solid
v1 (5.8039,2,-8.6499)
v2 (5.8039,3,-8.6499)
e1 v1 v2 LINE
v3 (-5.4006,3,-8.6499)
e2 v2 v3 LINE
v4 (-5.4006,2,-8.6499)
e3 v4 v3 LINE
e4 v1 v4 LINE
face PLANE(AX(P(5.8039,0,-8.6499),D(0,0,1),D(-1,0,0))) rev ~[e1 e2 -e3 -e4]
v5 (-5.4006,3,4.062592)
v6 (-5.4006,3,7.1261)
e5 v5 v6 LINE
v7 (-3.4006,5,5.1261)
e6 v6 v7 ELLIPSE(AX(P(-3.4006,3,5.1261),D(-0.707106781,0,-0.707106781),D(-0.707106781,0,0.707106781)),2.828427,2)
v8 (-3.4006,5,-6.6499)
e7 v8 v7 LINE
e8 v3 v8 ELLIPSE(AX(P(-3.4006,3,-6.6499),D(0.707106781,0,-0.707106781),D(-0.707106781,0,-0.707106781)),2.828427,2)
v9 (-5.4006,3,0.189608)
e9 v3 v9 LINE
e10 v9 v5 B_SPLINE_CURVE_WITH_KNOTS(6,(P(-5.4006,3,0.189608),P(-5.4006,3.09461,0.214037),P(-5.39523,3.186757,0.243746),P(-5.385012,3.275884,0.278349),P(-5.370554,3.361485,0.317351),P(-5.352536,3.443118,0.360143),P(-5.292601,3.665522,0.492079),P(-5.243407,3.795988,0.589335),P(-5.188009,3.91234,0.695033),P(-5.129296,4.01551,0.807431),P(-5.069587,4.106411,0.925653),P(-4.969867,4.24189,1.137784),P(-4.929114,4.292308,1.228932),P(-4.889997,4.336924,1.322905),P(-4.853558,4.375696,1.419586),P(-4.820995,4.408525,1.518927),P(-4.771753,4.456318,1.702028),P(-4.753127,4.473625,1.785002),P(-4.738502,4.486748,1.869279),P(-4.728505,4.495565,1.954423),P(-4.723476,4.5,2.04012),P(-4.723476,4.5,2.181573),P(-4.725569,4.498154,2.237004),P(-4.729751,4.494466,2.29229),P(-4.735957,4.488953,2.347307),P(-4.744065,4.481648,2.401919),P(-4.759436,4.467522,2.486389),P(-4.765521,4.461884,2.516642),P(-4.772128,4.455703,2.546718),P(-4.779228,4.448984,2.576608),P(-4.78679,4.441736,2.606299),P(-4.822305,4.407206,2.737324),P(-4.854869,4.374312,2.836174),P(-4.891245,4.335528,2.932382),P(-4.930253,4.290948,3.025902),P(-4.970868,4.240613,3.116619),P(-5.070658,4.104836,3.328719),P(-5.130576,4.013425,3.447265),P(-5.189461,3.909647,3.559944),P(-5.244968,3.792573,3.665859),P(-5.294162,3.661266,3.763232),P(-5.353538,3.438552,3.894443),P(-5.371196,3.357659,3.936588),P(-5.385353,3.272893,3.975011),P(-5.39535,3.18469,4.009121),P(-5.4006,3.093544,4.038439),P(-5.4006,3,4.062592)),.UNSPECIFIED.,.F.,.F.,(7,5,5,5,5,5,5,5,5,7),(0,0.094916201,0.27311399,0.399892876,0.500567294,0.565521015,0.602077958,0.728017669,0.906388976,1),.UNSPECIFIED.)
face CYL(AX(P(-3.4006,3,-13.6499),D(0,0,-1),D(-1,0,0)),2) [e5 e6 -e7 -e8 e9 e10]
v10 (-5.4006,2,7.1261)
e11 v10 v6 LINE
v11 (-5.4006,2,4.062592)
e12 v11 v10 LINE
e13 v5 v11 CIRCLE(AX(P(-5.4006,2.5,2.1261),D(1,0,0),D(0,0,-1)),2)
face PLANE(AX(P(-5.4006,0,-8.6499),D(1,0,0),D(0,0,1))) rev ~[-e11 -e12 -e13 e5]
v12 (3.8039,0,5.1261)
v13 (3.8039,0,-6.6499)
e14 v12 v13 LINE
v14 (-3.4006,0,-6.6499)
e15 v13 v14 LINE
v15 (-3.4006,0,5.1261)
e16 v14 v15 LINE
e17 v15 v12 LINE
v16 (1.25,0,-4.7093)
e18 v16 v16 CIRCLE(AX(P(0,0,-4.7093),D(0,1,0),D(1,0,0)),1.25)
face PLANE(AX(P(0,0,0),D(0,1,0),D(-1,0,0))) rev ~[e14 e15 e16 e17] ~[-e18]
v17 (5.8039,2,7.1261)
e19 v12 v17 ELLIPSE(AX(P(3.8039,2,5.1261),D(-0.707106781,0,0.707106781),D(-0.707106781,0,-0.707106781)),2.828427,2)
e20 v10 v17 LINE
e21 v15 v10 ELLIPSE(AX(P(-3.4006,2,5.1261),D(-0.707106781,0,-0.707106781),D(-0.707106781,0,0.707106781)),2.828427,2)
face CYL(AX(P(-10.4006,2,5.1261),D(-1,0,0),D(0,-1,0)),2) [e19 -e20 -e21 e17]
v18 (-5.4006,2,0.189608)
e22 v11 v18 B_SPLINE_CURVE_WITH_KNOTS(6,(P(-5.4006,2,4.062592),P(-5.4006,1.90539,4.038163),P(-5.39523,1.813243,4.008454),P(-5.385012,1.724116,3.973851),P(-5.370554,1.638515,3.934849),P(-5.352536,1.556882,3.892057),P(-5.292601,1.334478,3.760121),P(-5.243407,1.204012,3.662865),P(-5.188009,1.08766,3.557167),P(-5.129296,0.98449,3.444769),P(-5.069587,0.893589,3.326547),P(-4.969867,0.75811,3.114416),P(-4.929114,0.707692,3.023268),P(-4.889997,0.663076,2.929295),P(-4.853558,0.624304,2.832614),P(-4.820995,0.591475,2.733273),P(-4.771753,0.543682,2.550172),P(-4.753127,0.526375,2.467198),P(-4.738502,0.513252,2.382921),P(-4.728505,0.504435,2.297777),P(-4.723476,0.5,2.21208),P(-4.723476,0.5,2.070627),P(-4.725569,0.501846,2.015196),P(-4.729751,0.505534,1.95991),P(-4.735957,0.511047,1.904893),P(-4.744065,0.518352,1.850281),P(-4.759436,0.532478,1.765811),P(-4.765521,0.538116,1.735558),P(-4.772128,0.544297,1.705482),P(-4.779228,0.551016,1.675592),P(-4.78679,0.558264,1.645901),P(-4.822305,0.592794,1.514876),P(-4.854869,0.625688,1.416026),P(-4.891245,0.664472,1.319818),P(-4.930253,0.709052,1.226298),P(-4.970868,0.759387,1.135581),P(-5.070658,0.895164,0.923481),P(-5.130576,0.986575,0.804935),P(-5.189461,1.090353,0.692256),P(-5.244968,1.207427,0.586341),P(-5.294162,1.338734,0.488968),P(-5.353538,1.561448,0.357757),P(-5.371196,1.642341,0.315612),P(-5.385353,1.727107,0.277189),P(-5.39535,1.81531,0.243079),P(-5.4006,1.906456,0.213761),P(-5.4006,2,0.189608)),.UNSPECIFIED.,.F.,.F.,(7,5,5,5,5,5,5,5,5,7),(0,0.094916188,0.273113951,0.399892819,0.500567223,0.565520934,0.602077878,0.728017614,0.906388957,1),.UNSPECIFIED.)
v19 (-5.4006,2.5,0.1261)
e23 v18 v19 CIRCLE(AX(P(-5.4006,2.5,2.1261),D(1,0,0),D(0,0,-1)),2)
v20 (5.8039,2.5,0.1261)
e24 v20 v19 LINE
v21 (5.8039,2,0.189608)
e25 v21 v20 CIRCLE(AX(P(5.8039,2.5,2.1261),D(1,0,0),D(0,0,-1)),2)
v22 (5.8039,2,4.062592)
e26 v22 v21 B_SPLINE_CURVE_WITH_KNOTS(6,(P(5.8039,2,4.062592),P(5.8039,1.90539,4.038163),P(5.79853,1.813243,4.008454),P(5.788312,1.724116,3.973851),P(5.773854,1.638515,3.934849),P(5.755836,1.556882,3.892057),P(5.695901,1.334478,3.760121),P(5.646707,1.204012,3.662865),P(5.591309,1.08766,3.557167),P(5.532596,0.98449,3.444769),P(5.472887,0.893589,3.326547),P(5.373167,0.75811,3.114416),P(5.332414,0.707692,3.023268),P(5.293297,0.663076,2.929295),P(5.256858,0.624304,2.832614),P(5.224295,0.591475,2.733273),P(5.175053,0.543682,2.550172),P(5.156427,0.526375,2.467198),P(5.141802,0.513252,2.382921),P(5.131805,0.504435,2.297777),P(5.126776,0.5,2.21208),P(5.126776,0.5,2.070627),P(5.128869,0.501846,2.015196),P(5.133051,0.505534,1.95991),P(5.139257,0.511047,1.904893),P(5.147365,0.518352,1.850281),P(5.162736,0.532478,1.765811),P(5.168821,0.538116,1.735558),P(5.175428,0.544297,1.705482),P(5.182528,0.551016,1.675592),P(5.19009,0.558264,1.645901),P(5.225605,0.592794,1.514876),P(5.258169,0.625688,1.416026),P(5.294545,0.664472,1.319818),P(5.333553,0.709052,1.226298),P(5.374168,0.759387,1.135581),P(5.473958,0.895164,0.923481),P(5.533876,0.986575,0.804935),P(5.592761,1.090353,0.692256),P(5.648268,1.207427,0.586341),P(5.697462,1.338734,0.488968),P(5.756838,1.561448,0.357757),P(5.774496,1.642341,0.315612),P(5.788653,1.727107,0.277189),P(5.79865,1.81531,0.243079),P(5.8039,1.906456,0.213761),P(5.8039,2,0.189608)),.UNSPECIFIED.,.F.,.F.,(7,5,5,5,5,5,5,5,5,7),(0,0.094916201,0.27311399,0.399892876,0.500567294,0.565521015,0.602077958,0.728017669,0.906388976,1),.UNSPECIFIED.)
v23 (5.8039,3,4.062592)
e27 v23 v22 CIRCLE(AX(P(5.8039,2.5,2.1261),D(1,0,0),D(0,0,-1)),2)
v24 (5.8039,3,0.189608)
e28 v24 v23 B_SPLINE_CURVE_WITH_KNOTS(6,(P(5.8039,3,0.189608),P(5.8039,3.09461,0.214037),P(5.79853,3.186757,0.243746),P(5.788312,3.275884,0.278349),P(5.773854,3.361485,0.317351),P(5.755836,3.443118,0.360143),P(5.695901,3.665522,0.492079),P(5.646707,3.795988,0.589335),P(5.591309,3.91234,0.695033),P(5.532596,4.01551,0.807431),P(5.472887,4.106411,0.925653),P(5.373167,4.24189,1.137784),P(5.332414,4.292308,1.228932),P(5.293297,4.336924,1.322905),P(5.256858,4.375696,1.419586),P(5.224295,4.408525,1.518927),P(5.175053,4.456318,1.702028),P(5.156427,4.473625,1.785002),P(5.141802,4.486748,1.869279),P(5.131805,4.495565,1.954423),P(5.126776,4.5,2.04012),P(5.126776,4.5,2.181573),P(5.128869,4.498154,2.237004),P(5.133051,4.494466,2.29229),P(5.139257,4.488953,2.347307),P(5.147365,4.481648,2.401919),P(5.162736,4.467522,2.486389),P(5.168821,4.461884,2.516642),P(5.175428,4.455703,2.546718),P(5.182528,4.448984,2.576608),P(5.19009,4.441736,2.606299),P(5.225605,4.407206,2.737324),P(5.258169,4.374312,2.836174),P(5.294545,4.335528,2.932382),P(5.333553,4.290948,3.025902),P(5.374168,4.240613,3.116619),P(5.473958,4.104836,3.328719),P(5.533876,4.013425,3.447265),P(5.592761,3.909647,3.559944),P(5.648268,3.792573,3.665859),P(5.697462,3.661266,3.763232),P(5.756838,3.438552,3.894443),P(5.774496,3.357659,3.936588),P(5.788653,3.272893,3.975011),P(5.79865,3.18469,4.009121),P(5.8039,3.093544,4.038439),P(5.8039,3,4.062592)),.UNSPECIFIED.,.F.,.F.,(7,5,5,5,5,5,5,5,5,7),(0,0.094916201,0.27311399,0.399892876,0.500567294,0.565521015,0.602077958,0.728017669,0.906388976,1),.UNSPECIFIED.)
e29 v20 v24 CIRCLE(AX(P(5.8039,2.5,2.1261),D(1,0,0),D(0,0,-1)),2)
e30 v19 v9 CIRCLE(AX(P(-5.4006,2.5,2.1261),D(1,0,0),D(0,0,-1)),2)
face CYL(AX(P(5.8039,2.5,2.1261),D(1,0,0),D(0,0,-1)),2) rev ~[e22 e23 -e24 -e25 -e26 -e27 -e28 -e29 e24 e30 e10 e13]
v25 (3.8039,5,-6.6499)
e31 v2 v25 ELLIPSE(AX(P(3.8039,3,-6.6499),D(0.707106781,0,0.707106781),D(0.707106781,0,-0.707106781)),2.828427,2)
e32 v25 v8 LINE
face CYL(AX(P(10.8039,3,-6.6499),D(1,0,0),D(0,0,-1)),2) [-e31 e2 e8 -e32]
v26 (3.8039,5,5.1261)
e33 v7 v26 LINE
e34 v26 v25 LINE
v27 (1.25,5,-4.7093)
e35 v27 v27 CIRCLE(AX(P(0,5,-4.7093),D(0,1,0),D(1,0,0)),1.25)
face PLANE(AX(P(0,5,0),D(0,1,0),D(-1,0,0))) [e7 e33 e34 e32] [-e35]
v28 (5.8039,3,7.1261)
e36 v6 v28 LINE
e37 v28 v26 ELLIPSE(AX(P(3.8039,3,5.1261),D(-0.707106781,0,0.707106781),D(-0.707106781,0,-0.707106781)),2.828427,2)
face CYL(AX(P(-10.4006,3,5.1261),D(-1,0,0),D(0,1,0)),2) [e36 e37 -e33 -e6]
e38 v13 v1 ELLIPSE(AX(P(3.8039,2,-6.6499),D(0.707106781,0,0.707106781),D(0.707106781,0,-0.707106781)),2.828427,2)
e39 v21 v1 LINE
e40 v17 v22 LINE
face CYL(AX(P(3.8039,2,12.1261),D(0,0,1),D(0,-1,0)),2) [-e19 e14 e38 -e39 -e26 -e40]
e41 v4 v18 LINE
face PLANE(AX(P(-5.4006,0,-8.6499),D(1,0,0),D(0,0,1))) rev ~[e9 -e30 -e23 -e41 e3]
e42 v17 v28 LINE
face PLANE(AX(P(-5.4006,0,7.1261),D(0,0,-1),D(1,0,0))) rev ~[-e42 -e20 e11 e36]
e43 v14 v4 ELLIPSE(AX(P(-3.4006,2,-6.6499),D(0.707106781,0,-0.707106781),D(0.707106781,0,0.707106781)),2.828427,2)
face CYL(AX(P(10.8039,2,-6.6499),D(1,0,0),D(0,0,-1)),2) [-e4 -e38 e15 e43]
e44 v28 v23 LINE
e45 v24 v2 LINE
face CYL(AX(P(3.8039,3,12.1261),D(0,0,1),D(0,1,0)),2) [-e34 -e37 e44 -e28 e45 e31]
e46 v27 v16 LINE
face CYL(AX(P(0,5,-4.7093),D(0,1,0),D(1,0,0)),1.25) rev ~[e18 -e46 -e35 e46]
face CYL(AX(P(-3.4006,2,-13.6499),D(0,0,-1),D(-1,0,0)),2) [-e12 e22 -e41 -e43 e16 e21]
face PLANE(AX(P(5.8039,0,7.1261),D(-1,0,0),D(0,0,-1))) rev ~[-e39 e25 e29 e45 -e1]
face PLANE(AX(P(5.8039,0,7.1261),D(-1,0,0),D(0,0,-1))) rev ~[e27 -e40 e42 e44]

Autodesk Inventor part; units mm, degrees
ref_plane "YZ Plane" through (0, 0, 0) normal (1, 0, 0) x (0, 1, 0)
ref_plane "XZ Plane" through (0, 0, 0) normal (0, 1, 0) x (-1, 0, 0)
ref_plane "XY Plane" through (0, 0, 0) normal (0, 0, 1) x (1, 0, 0)
sketch "Sketch1" plane through (0, 0, 0) normal (0, 1, 0) x (-1, 0, 0)
  line L0 (5.4006, 7.1261) -> (-5.8039, 7.1261)
  line L1 (-5.8039, 7.1261) -> (-5.8039, -8.6499)
  line L2 (-5.8039, -8.6499) -> (5.4006, -8.6499)
  line L3 (5.4006, -8.6499) -> (5.4006, 7.1261)
  point P0 (0, 0)
extrude "Extrusion1" add sketch "Sketch1" along normal blind 5
sketch "Sketch2" plane through (5.8039, 0, 7.1261) normal (1, 0, 0) x (0, 0, -1)
  line L0 (0, 5) -> (15.7759, 5) projected
  circle A0 centre (5, 2.5) radius 2
  line L1 (0, 0) -> (0, 5) projected
  point P0 (7.1261, 0)
  dimension "d6" = 4
  dimension "d7" = 5
extrude "Extrusion2" cut sketch "Sketch2" against normal through all
fillet "Fillet1" radius 2 8 edges at (0.2017, 5, 7.1261) (0.2017, 0, 7.1261) (-5.4006, 5, -0.7619) (0.2017, 5, -8.6499) (0.2017, 0, -8.6499) (5.8039, 0, -0.7619) (5.8039, 5, -0.7619) (-5.4006, 0, -0.7619)
sketch "Sketch3" plane through (0, 5, 0) normal (0, 1, 0) x (1, 0, 0)
  circle A0 centre (0, 4.7093) radius 1.25
  point P0 (0, 0)
  dimension "d9" = 2.5
extrude "Extrusion3" cut sketch "Sketch3" against normal through all
properties part number "hands"
